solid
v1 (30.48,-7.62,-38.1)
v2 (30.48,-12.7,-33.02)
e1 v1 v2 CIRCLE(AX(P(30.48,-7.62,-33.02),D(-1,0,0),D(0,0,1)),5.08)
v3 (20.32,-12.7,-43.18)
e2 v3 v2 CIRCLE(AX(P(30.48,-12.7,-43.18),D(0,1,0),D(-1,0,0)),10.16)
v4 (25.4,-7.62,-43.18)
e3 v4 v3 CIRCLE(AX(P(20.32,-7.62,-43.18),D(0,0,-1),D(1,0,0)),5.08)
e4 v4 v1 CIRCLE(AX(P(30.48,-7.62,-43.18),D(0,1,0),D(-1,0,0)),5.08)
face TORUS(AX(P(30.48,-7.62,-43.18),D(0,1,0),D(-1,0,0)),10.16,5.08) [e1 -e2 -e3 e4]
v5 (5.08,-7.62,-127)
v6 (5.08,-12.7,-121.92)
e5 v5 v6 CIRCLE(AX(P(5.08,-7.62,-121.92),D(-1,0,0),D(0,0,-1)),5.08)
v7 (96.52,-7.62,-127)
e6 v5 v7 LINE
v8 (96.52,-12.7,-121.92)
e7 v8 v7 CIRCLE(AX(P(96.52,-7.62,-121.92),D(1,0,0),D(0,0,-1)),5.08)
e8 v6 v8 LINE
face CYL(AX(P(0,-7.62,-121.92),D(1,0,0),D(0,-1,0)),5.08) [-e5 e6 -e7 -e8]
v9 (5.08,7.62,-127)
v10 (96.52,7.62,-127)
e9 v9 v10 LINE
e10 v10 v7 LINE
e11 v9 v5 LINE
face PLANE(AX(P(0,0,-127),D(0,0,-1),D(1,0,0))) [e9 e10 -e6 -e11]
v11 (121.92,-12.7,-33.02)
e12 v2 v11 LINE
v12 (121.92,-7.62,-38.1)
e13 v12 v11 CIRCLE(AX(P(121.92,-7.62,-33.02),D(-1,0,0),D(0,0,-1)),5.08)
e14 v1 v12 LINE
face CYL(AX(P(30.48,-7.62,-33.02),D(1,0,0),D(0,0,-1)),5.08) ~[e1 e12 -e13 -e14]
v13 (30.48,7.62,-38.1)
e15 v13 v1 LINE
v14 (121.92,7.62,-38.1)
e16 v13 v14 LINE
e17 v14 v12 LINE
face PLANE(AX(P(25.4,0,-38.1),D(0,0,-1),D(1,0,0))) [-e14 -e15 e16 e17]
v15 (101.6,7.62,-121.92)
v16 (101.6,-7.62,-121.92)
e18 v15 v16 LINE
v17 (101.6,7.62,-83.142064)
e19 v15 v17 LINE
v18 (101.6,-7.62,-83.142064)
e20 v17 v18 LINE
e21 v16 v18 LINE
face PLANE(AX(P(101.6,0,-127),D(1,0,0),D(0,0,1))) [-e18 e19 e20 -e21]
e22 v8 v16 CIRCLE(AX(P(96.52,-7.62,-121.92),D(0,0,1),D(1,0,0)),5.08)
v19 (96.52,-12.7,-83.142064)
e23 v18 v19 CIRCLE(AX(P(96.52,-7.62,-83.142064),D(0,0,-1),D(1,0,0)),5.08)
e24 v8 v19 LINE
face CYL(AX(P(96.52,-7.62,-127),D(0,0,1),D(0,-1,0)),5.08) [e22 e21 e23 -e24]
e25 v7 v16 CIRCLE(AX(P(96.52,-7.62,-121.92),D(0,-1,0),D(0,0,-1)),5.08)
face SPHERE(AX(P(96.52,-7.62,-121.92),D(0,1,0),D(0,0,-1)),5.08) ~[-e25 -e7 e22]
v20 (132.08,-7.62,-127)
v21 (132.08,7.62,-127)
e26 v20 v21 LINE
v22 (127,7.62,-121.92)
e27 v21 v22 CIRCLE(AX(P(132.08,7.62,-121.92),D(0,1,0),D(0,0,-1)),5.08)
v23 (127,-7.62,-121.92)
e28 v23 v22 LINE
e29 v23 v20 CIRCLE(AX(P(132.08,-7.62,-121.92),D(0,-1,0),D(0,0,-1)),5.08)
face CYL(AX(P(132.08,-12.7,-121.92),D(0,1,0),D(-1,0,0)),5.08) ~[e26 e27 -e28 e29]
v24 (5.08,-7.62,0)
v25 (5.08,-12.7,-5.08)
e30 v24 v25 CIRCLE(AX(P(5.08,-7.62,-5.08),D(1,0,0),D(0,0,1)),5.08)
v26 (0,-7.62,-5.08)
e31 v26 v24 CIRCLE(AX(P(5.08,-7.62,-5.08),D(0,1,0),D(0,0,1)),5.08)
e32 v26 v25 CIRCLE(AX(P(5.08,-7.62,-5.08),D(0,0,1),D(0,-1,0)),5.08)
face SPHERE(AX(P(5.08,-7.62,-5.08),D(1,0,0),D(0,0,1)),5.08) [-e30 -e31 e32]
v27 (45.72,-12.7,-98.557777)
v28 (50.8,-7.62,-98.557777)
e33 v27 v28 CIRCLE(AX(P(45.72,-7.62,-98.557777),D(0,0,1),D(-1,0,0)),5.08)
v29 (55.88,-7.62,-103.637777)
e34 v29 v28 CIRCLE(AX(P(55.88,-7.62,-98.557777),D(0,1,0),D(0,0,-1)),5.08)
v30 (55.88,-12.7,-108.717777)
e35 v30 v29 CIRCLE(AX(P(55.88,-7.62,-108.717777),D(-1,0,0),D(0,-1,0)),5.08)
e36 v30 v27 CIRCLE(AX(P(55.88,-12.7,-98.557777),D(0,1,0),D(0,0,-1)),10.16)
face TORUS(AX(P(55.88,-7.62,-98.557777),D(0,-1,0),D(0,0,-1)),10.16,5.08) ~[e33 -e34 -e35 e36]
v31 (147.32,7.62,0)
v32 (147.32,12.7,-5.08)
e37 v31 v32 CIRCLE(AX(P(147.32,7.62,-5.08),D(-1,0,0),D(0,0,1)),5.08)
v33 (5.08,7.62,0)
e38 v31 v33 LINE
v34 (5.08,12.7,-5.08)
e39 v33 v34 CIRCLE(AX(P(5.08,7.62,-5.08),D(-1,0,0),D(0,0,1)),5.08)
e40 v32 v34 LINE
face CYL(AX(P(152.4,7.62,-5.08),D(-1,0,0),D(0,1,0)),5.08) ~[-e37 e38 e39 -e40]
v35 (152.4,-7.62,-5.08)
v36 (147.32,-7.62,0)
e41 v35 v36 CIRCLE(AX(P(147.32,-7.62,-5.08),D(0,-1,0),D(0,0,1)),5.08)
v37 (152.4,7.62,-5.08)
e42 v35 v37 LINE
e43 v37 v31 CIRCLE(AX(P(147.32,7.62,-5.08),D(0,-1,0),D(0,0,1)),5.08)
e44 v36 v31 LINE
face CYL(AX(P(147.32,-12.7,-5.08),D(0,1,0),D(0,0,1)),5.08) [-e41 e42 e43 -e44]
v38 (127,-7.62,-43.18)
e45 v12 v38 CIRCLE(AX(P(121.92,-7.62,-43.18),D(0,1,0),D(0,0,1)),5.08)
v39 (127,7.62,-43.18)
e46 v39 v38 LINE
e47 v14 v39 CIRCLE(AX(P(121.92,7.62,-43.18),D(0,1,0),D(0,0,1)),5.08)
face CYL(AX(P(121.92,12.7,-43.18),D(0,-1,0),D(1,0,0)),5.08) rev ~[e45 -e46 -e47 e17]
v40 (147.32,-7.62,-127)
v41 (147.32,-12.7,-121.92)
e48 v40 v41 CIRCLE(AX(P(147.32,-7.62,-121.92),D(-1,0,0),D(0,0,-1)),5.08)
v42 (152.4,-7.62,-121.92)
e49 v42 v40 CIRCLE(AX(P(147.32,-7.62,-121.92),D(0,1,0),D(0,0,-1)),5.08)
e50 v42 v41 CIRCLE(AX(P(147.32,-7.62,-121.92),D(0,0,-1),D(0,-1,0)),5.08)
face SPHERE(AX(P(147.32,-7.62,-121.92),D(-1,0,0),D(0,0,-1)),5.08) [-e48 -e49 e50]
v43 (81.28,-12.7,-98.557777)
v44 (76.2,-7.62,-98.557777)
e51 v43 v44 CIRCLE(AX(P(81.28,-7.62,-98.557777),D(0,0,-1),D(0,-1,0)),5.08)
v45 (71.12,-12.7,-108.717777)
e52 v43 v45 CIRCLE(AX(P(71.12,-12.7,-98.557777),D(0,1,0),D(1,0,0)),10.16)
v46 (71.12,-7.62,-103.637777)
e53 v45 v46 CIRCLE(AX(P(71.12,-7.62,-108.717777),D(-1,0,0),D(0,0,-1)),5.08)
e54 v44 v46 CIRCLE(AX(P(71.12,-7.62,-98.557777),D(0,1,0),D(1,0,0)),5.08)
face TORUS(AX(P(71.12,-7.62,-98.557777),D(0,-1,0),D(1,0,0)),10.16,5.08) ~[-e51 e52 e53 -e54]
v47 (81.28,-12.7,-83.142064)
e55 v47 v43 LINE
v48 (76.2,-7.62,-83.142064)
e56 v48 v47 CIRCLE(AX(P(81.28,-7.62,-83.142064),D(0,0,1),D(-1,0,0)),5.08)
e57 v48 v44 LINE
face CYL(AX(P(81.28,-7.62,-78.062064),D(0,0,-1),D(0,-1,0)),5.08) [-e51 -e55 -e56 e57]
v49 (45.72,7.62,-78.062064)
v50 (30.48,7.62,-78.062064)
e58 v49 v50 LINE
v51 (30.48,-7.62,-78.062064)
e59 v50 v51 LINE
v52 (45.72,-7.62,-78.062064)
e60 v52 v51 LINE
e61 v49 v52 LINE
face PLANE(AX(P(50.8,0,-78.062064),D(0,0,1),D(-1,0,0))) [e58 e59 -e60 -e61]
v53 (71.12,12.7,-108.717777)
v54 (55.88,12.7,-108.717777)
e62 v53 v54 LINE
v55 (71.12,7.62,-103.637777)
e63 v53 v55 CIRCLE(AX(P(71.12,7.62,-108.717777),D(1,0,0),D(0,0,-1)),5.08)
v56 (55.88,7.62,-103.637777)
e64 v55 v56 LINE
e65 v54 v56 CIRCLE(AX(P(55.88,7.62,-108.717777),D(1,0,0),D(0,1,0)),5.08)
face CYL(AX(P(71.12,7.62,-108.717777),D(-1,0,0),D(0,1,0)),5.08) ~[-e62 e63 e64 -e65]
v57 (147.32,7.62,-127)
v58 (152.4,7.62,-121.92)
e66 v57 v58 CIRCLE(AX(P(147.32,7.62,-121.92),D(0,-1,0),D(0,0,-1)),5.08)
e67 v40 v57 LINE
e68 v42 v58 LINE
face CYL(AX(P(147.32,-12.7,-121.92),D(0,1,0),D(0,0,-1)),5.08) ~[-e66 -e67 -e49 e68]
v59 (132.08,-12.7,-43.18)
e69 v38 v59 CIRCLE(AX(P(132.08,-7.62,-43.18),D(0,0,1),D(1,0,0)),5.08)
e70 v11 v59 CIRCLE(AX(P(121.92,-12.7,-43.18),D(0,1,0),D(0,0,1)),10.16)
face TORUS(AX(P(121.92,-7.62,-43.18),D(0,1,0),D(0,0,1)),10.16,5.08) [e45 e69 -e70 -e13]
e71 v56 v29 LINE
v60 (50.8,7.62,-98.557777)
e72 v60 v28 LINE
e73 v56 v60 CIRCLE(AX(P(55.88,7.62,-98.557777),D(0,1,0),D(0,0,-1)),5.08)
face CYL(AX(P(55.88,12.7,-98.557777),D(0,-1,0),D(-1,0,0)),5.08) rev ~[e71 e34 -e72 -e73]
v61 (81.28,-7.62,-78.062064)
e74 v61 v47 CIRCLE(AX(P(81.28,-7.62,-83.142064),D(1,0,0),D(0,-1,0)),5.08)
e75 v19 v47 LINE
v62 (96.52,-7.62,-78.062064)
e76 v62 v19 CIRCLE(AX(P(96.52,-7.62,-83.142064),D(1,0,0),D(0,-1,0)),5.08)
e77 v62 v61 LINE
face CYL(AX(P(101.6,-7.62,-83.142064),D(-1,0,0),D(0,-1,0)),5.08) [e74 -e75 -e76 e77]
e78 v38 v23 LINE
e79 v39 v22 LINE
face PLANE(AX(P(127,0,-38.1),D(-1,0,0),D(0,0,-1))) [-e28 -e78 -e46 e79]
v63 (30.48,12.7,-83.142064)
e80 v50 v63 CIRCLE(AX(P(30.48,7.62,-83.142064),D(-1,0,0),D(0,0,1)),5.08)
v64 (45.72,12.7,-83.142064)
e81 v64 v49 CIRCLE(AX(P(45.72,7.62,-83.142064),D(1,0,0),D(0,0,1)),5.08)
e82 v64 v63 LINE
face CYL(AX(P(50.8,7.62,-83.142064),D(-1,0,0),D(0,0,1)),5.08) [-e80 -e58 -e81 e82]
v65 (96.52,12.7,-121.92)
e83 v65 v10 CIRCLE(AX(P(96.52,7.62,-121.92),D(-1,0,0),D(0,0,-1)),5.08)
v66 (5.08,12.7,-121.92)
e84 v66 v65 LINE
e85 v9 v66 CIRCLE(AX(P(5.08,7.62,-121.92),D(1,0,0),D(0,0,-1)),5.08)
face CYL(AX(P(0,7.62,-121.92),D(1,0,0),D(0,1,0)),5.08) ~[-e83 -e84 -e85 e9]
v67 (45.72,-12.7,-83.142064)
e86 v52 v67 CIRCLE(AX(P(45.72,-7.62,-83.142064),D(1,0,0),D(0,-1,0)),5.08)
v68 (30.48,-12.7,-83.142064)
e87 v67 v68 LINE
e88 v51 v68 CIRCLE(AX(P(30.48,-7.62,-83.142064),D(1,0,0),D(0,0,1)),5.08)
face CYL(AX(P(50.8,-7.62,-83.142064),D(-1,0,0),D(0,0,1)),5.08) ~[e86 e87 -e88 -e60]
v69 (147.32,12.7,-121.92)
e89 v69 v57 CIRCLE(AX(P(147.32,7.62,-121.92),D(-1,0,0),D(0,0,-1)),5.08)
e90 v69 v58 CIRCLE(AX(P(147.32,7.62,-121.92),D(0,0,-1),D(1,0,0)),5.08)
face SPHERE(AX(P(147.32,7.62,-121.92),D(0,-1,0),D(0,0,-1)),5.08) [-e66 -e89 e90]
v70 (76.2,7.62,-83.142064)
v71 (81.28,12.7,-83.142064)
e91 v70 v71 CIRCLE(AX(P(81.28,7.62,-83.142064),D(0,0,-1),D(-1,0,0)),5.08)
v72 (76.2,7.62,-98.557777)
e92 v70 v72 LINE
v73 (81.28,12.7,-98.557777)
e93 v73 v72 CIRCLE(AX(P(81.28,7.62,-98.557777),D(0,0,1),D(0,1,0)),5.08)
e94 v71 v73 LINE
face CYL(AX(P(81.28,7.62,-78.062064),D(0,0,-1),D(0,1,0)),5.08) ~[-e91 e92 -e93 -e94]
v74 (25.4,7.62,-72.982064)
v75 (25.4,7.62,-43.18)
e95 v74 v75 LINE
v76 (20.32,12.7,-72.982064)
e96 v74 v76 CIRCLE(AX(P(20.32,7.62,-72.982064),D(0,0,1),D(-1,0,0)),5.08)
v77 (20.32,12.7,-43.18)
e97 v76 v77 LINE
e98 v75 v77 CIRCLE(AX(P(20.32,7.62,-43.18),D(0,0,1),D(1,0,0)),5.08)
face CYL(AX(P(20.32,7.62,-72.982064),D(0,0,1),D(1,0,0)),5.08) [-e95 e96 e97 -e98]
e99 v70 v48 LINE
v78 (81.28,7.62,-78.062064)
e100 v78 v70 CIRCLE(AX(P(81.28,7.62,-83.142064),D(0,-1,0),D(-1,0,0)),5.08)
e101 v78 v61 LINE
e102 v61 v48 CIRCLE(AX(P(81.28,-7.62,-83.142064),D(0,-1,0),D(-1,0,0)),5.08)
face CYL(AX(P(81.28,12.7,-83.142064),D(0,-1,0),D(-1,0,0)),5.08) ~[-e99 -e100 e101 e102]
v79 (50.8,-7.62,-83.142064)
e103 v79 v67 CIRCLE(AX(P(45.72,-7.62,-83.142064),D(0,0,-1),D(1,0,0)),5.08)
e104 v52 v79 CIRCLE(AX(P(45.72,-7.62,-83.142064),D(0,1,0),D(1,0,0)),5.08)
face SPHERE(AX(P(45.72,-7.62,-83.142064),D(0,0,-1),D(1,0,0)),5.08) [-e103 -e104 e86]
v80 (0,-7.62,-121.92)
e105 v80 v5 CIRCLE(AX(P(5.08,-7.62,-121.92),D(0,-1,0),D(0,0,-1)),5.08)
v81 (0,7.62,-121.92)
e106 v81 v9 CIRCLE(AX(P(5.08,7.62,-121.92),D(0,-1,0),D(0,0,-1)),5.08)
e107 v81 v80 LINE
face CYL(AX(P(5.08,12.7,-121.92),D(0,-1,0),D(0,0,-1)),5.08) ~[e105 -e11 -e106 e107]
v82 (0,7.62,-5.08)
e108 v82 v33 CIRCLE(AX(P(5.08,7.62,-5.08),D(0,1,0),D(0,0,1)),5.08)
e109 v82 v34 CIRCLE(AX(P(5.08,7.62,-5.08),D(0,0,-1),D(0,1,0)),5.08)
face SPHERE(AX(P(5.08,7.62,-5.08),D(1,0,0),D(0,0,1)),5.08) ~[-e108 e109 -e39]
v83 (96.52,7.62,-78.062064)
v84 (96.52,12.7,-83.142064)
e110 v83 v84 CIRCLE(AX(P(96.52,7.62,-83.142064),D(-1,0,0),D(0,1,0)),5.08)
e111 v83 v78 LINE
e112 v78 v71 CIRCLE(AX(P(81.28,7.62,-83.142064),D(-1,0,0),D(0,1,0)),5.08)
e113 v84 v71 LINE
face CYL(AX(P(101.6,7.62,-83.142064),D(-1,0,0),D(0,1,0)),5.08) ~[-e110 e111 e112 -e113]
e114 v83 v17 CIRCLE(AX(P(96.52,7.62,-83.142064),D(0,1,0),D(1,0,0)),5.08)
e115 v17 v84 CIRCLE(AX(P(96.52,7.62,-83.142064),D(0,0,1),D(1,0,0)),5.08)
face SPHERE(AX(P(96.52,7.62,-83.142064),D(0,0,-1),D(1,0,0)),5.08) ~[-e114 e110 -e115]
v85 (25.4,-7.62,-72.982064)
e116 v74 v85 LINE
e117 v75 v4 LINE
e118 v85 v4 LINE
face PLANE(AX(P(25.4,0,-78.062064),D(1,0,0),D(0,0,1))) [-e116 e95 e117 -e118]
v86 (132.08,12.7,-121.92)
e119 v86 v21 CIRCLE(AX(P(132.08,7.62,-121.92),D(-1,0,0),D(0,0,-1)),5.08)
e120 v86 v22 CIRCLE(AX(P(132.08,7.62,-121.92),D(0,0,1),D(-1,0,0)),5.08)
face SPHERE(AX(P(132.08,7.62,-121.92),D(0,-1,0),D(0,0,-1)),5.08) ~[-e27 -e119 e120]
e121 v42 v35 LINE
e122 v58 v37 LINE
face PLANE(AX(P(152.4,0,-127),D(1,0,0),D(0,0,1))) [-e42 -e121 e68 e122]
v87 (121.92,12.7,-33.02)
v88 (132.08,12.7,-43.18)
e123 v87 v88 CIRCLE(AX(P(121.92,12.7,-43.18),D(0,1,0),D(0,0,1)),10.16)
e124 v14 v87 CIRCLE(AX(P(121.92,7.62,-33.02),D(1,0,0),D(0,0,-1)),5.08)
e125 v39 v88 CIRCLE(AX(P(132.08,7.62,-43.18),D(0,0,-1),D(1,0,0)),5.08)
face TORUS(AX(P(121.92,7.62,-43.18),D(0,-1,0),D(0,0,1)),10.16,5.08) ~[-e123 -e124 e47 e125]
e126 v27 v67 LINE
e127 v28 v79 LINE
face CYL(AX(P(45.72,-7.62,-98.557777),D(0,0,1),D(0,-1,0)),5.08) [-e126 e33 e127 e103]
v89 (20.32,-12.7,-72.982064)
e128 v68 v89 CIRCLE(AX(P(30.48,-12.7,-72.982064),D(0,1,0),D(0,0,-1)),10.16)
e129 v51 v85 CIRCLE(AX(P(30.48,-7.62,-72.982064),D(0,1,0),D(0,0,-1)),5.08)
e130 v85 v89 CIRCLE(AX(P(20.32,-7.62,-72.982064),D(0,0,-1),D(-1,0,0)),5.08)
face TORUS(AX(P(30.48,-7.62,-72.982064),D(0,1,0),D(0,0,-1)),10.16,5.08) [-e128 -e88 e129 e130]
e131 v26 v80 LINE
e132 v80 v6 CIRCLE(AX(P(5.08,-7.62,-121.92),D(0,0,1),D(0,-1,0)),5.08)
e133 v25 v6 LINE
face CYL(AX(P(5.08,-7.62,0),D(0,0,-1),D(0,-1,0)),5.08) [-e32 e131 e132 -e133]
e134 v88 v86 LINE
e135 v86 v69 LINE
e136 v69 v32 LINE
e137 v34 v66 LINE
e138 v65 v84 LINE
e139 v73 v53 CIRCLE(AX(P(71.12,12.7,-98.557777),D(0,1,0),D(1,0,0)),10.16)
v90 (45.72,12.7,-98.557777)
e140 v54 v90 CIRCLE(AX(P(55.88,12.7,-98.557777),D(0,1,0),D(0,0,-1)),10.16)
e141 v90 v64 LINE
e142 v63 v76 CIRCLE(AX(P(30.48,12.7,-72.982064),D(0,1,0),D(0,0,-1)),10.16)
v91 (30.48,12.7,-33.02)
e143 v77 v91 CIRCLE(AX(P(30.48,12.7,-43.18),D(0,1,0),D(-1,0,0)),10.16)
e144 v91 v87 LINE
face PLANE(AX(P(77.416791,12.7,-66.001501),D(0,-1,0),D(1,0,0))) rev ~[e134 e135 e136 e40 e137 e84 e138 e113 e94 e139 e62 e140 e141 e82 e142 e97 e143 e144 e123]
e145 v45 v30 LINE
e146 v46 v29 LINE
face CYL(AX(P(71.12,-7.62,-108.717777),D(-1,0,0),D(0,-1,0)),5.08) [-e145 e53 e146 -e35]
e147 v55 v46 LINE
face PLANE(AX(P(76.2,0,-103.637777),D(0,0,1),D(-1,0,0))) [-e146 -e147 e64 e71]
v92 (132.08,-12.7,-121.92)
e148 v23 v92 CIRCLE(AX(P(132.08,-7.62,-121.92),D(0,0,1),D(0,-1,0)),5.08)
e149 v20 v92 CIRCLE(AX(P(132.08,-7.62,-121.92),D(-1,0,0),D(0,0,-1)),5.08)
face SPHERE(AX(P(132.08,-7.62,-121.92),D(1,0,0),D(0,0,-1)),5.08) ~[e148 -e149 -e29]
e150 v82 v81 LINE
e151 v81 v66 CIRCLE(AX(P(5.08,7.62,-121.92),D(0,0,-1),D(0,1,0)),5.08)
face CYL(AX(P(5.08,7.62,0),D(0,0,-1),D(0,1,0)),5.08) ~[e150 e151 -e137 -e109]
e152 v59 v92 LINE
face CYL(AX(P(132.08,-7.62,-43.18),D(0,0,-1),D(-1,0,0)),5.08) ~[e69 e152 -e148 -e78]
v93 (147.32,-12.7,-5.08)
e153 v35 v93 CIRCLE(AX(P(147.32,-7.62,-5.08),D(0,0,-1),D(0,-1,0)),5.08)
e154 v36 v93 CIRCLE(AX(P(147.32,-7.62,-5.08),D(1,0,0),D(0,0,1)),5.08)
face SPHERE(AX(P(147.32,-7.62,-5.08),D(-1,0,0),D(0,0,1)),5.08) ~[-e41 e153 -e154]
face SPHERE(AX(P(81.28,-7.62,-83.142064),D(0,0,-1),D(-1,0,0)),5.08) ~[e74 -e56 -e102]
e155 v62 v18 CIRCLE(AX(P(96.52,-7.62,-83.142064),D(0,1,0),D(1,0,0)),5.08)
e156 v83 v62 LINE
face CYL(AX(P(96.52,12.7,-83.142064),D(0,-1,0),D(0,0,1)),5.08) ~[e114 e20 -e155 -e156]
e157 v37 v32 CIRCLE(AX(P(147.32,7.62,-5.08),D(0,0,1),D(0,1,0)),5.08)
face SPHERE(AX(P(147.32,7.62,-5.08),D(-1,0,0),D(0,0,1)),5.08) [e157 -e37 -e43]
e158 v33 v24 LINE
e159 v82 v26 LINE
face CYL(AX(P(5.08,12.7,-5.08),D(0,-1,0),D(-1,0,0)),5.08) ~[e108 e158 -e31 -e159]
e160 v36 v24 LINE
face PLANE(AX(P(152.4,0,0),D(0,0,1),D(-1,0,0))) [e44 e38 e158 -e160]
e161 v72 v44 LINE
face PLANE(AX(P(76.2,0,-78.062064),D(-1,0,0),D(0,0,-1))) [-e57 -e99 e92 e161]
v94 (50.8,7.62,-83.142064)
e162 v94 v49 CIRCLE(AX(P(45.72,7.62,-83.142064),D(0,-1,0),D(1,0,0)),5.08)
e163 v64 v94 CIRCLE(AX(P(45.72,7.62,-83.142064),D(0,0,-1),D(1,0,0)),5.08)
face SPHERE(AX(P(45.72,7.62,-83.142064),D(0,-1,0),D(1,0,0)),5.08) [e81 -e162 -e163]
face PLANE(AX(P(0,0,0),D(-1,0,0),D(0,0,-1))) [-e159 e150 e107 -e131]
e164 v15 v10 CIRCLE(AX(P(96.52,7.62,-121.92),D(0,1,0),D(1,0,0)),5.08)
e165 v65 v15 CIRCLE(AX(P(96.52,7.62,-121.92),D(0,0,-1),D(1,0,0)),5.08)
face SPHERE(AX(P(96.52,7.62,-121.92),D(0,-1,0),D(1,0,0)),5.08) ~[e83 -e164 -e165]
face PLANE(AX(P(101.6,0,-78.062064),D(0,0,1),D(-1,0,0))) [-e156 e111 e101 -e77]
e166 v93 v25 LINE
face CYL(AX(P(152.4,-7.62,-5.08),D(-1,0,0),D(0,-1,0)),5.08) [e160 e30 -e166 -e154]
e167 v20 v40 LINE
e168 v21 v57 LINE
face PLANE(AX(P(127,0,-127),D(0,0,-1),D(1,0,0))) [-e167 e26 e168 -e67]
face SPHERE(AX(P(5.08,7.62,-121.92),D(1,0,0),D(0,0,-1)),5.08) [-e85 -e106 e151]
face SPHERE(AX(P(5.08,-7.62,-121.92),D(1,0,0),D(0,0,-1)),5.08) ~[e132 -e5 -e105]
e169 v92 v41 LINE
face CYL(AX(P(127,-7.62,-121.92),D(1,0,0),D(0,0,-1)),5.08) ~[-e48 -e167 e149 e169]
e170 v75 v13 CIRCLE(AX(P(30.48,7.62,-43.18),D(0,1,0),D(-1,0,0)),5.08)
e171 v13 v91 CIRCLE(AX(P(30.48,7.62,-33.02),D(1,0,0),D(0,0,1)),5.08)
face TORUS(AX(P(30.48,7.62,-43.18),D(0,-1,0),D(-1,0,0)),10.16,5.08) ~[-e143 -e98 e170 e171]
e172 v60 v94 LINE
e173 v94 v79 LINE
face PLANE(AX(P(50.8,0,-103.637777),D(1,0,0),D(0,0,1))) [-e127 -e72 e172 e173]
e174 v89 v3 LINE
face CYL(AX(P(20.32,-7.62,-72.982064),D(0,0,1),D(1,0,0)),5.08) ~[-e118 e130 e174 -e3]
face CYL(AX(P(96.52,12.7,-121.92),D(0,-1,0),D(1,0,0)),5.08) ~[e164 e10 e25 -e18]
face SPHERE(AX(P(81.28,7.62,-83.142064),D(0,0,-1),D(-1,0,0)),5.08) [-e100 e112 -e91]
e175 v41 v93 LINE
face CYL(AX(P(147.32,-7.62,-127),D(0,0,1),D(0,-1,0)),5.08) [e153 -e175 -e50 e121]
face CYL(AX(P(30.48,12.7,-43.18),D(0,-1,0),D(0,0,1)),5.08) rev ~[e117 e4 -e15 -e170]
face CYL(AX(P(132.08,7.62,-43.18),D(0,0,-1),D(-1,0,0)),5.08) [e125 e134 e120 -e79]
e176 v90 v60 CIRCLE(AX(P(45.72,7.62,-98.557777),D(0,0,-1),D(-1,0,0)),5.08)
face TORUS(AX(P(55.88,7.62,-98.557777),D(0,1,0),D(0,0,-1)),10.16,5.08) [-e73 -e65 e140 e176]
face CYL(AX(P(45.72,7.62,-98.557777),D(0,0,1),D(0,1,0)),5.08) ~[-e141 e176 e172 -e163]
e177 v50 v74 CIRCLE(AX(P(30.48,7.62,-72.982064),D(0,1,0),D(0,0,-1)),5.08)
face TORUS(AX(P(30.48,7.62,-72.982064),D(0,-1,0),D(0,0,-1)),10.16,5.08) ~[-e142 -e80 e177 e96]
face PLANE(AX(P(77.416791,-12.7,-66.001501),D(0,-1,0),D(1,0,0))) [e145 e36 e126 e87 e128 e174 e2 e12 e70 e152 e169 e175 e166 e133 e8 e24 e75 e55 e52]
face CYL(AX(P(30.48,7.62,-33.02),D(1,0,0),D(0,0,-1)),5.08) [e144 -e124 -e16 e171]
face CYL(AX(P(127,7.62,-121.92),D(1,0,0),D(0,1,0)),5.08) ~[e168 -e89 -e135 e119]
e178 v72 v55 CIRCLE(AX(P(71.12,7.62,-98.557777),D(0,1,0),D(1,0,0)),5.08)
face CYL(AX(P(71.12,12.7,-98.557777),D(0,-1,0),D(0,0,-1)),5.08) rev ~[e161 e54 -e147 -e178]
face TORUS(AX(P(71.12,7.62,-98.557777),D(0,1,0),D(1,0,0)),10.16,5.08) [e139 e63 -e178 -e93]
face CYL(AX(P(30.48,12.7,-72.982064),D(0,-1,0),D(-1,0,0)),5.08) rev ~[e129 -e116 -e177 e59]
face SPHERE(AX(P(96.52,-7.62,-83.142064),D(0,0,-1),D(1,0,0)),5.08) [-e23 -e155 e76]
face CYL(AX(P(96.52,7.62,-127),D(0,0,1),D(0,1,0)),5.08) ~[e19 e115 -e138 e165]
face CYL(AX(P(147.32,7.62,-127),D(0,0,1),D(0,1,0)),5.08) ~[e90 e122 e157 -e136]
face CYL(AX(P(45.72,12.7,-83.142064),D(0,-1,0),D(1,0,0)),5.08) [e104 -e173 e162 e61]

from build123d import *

# Parameters (mm, degrees)
F1_DEPTH = 12.7
F2_F1_R  = 5.08
F2_F2_R  = 5.08


with BuildPart() as f1:
    # F0 (on Front) → F1 (new body, symmetric)
    with BuildSketch(Plane.XZ):
        Polygon((152.4, 0), (0, 0), (0, -127), (101.6, -127), (101.6, -78.0620644748), (76.2, -78.0620644748), (76.2, -103.637776798), (50.8, -103.637776798), (50.8, -78.0620644748), (25.4, -78.0620644748), (25.4, -38.1), (127, -38.1), (127, -127), (152.4, -127), align=None)
    extrude(amount=F1_DEPTH, both=True)

    # F2: fillet of radius 5.08 on 40 edges, made by hand

    # F2_f1
    f2_f1_edges = [f1.edges().sort_by_distance(p)[0] for p in [
        (25.4, 0, -78.0620644748),
        (25.4, 0, -38.1),
        (127, 0, -38.1),
        (76.2, 0, -103.637776798),
        (50.8, 0, -103.637776798),
    ]]
    fillet(f2_f1_edges, radius=F2_F1_R)

    # F2_f2
    f2_f2_edges = [f1.edges().sort_by_distance(p)[0] for p in [
        (76.2, -12.7, 0),
        (76.2, 12.7, 0),
        (152.4, 0, 0),
        (0, 0, 0),
        (139.7, -12.7, -127),
        (152.4, 0, -127),
        (127, 0, -127),
        (139.7, 12.7, -127),
        (101.6, 0, -127),
        (50.8, -12.7, -127),
        (101.6, -12.7, -102.5310322374),
        (101.6, 12.7, -102.5310322374),
        (101.6, 0, -78.0620644748),
        (50.8, 12.7, -127),
        (0, 0, -127),
        (63.5, -12.7, -103.637776798),
        (76.2, -12.7, -88.3099206364),
        (50.8, -12.7, -88.3099206364),
        (50.8, 0, -78.0620644748),
        (50.8, 12.7, -88.3099206364),
        (63.5, 12.7, -103.637776798),
        (76.2, 0, -78.0620644748),
        (88.9, 12.7, -78.0620644748),
        (127, -12.7, -85.09),
        (127, 12.7, -85.09),
        (76.2, -12.7, -38.1),
        (25.4, -12.7, -58.0810322374),
        (40.64, -12.7, -78.0620644748),
        (0, -12.7, -63.5),
        (88.9, -12.7, -78.0620644748),
        (40.64, 12.7, -78.0620644748),
        (0, 12.7, -63.5),
        (25.4, 12.7, -58.0810322374),
        (152.4, -12.7, -63.5),
        (152.4, 12.7, -63.5),
        (26.8878975516, 12.7, -76.5741669232),
        (26.8878975516, 12.7, -39.5878975516),
        (26.8878975516, -12.7, -76.5741669232),
        (26.8878975516, -12.7, -39.5878975516),
        (125.5121024484, -12.7, -39.5878975516),
        (125.5121024484, 12.7, -39.5878975516),
        (74.7121024484, 12.7, -102.1498792464),
        (52.2878975516, 12.7, -102.1498792464),
        (52.2878975516, -12.7, -102.1498792464),
        (74.7121024484, -12.7, -102.1498792464),
    ]]
    fillet(f2_f2_edges, radius=F2_F2_R)


solid = f1.part
